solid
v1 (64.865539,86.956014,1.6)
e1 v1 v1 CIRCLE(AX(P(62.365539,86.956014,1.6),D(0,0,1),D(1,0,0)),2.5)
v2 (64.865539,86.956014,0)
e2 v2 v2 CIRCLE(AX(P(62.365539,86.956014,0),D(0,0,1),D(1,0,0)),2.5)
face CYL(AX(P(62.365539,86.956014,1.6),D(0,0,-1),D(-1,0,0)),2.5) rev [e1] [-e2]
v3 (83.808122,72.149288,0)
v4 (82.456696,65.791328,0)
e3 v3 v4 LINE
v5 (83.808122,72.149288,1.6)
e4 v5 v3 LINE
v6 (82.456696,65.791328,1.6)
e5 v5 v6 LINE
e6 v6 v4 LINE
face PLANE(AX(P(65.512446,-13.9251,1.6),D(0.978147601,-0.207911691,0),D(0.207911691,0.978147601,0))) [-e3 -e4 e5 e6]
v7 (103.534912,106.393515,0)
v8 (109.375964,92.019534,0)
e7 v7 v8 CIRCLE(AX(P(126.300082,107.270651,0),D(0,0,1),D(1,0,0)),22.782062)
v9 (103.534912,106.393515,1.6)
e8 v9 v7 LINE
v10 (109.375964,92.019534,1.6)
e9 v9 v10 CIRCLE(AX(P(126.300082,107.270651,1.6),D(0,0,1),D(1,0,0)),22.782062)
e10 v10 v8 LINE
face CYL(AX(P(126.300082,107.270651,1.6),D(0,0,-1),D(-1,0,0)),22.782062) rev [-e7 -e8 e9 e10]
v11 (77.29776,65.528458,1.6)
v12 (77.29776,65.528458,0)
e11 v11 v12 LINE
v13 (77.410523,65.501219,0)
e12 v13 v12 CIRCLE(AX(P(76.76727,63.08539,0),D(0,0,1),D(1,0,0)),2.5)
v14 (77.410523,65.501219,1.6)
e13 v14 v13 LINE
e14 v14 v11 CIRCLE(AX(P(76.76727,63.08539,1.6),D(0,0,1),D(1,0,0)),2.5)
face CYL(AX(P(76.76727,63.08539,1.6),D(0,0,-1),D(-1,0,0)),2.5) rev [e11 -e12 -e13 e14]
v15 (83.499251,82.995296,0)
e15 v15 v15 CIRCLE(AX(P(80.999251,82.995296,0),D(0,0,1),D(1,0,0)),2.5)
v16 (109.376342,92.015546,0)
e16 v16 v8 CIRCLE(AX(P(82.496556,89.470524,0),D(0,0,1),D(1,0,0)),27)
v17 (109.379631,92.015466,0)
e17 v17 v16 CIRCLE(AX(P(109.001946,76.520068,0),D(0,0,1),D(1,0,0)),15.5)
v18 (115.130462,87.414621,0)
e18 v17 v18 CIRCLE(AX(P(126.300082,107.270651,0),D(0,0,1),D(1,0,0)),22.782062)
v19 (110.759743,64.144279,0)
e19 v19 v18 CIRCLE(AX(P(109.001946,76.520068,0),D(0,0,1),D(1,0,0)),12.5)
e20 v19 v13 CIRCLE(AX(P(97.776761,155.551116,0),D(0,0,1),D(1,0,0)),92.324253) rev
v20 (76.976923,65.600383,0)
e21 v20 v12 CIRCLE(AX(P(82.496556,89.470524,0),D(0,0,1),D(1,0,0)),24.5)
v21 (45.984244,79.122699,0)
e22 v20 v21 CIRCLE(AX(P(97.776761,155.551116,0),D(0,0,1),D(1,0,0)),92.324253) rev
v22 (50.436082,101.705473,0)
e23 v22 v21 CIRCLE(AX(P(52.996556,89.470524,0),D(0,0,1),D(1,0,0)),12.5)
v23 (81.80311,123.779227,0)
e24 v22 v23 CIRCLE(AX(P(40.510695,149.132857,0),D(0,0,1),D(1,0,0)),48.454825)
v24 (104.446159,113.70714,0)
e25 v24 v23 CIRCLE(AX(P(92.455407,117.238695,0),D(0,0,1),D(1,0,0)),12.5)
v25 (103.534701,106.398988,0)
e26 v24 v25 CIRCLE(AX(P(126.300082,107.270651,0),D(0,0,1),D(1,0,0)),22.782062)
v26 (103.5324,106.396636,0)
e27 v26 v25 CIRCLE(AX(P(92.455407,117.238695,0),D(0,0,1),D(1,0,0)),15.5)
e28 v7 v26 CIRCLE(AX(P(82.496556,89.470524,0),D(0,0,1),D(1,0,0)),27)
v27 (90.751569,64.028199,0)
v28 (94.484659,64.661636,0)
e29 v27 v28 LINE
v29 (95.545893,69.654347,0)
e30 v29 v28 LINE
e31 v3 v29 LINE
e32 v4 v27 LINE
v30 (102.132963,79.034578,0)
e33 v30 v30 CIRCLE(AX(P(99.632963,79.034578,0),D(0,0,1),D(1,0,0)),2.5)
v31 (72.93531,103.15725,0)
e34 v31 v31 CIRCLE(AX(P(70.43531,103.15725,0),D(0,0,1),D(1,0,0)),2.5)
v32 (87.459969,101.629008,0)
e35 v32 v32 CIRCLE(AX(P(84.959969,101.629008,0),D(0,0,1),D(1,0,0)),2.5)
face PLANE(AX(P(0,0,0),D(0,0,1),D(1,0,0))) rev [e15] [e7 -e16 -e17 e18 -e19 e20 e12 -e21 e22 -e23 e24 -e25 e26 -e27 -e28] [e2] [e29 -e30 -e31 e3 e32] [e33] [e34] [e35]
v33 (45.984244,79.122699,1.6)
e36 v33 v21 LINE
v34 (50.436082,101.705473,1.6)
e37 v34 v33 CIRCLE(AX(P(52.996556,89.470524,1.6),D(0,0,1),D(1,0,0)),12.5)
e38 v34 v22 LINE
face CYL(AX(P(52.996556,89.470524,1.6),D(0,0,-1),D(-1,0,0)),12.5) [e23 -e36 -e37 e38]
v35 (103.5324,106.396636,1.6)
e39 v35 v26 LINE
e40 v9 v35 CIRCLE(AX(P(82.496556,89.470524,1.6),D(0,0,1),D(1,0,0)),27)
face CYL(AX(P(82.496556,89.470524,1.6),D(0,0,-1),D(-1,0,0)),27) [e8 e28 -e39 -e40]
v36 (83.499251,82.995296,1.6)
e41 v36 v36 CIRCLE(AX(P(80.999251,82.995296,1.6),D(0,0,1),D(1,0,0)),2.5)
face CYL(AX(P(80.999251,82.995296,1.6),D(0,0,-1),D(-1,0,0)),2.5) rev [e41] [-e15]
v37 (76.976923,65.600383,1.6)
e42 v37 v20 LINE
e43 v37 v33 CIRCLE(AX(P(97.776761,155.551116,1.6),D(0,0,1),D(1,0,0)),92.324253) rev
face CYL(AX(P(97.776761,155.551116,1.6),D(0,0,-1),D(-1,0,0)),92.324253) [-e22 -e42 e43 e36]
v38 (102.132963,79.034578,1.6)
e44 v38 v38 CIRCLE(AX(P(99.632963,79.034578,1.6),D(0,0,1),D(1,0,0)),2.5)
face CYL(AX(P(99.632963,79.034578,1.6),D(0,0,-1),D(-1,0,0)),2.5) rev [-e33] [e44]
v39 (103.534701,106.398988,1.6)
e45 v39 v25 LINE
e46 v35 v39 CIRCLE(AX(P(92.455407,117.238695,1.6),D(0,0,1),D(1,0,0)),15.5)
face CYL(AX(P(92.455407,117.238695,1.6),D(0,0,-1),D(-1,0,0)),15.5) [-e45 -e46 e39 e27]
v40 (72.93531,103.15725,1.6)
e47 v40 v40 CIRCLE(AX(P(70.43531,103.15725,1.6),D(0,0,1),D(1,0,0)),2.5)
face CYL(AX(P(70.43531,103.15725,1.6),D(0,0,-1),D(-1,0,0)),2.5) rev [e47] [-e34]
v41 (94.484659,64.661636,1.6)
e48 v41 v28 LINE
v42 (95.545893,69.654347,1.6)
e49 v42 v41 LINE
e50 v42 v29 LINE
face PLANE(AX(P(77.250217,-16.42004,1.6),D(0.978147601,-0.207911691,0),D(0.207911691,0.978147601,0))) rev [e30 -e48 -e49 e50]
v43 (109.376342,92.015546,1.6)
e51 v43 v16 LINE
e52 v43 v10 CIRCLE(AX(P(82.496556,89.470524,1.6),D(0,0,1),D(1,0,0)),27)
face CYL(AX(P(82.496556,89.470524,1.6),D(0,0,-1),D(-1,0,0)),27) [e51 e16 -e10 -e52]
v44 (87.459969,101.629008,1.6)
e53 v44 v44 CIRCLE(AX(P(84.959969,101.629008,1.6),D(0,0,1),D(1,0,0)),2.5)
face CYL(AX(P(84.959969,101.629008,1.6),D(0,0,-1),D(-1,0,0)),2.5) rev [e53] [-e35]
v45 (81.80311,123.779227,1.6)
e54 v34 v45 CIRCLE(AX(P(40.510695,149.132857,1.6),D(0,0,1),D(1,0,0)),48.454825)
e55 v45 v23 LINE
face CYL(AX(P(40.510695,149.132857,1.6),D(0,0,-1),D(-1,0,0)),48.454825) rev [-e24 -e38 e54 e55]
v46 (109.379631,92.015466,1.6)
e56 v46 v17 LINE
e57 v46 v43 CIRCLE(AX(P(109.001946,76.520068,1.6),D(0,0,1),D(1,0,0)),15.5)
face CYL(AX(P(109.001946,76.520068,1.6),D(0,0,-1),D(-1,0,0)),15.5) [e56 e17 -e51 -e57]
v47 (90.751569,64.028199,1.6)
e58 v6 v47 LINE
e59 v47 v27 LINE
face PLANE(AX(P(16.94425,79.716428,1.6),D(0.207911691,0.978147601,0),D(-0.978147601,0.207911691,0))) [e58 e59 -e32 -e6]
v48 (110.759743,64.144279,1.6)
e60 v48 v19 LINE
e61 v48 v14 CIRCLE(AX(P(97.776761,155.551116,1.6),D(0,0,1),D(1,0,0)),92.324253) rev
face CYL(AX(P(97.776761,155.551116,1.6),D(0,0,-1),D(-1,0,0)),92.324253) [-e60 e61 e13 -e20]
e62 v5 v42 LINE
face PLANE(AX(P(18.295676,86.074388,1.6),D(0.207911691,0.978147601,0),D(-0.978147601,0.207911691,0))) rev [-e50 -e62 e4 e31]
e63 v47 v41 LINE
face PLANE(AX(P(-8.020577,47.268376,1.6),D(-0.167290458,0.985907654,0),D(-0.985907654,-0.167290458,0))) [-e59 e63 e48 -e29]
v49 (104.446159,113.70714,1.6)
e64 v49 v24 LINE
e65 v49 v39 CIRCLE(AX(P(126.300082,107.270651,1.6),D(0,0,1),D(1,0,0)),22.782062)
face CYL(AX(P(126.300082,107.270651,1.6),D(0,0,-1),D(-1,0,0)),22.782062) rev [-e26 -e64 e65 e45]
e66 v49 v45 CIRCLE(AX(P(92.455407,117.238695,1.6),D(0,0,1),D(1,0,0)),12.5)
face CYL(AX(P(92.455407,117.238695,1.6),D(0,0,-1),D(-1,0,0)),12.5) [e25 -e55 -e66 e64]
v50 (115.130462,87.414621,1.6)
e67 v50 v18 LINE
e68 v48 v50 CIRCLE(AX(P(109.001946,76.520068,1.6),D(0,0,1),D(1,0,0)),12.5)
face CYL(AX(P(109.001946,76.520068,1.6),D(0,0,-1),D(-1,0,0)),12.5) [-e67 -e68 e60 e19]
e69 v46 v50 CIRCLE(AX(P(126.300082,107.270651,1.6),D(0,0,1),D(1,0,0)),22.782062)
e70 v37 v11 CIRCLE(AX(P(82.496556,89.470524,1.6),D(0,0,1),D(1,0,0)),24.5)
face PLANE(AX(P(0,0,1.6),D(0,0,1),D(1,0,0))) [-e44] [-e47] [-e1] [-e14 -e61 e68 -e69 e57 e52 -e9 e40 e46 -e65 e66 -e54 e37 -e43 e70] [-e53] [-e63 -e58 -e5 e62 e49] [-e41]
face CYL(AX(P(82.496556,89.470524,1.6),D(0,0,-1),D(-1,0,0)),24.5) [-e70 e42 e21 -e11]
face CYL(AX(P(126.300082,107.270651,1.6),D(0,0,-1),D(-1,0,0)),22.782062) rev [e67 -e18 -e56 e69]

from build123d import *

# Parameters (mm, degrees)
BOSS_EXTRUDE1_DEPTH = 1.6
SKETCH8_3_R         = 2.5
CUT_EXTRUDE1_DEPTH  = 178.756608161
SKETCH25_R          = 2.5
CUT_EXTRUDE2_DEPTH  = 178.756608161
CUT_EXTRUDE3_DEPTH  = 175.275284078


with BuildPart() as part:
    # Sketch8 → Boss-Extrude1 (new body)
    with BuildSketch(Plane.XY):
        with BuildLine():
            ThreePointArc((103.534701401, 106.398987898), (103.693161759, 110.090138371), (104.446158593, 113.707139515))
            ThreePointArc((104.446158593, 113.707139515), (97.535722451, 128.659745128), (81.803110207, 123.779227301))
            ThreePointArc((81.803110207, 123.779227301), (68.396685685, 109.506582784), (50.436082024, 101.705472858))
            ThreePointArc((50.436082024, 101.705472858), (40.732585656, 91.888172428), (45.984244445, 79.122699094))
            ThreePointArc((45.984244445, 79.122699094), (60.856228216, 70.93053968), (76.976923111, 65.600382715))
            ThreePointArc((76.976923111, 65.600382715), (77.137220348, 65.563882378), (77.2977589, 65.528458486))
            ThreePointArc((77.2977589, 65.528458486), (77.354298773, 65.515492739), (77.410522602, 65.501218676))
            ThreePointArc((77.410522602, 65.501218676), (94.023303804, 63.303193357), (110.759742778, 64.144278965))
            ThreePointArc((110.759742778, 64.144278965), (121.287127646, 74.212620667), (115.130462452, 87.414620912))
            ThreePointArc((115.130462452, 87.414620912), (112.067901623, 89.481121015), (109.379631064, 92.015465685))
            ThreePointArc((109.379631064, 92.015465685), (109.377986421, 92.015505684), (109.376341775, 92.015545509))
            ThreePointArc((109.376341775, 92.015545509), (109.37615287, 92.017539878), (109.375963817, 92.019534234))
            ThreePointArc((109.375963817, 92.019534234), (105.194093866, 98.693961054), (103.534911629, 106.393514545))
            ThreePointArc((103.534911629, 106.393514545), (103.533655951, 106.395075463), (103.532400156, 106.396636288))
            ThreePointArc((103.532400156, 106.396636288), (103.533550841, 106.397812032), (103.534701401, 106.398987898))
        make_face()
    extrude(amount=BOSS_EXTRUDE1_DEPTH)

    # Sketch8<3> → Cut-Extrude1 (cut, through all)
    with BuildSketch(Plane.XY):
        with Locations((70.435309654, 103.157249982)):
            Circle(SKETCH8_3_R)
    extrude(amount=CUT_EXTRUDE1_DEPTH, mode=Mode.SUBTRACT)

    # Sketch25 → Cut-Extrude2 (cut, through all)
    with BuildSketch(Plane.XY):
        with Locations((84.959968883, 101.629007764)):
            Circle(SKETCH25_R)
        with Locations((62.365539379, 86.956013681)):
            Circle(SKETCH25_R)
        with Locations((80.999251173, 82.99529597)):
            Circle(SKETCH25_R)
        with Locations((99.632962967, 79.03457826)):
            Circle(SKETCH25_R)
    extrude(amount=CUT_EXTRUDE2_DEPTH, mode=Mode.SUBTRACT)

    # Sketch23 → Cut-Extrude3 (cut, through all)
    with BuildSketch(Plane(origin=(-19.097367964, 26.776820286, 0), x_dir=(0.9781476007338056, -0.2079116908177598, 0), z_dir=(0, 0, 1))):
        Polygon((103.223291241, 65.776224437), (91.223291241, 65.776224437), (91.223291241, 59.276224437), (99.703476733, 59.276224437), (103.223291241, 60.67197249), align=None)
    extrude(amount=CUT_EXTRUDE3_DEPTH, mode=Mode.SUBTRACT)


solid = part.part
